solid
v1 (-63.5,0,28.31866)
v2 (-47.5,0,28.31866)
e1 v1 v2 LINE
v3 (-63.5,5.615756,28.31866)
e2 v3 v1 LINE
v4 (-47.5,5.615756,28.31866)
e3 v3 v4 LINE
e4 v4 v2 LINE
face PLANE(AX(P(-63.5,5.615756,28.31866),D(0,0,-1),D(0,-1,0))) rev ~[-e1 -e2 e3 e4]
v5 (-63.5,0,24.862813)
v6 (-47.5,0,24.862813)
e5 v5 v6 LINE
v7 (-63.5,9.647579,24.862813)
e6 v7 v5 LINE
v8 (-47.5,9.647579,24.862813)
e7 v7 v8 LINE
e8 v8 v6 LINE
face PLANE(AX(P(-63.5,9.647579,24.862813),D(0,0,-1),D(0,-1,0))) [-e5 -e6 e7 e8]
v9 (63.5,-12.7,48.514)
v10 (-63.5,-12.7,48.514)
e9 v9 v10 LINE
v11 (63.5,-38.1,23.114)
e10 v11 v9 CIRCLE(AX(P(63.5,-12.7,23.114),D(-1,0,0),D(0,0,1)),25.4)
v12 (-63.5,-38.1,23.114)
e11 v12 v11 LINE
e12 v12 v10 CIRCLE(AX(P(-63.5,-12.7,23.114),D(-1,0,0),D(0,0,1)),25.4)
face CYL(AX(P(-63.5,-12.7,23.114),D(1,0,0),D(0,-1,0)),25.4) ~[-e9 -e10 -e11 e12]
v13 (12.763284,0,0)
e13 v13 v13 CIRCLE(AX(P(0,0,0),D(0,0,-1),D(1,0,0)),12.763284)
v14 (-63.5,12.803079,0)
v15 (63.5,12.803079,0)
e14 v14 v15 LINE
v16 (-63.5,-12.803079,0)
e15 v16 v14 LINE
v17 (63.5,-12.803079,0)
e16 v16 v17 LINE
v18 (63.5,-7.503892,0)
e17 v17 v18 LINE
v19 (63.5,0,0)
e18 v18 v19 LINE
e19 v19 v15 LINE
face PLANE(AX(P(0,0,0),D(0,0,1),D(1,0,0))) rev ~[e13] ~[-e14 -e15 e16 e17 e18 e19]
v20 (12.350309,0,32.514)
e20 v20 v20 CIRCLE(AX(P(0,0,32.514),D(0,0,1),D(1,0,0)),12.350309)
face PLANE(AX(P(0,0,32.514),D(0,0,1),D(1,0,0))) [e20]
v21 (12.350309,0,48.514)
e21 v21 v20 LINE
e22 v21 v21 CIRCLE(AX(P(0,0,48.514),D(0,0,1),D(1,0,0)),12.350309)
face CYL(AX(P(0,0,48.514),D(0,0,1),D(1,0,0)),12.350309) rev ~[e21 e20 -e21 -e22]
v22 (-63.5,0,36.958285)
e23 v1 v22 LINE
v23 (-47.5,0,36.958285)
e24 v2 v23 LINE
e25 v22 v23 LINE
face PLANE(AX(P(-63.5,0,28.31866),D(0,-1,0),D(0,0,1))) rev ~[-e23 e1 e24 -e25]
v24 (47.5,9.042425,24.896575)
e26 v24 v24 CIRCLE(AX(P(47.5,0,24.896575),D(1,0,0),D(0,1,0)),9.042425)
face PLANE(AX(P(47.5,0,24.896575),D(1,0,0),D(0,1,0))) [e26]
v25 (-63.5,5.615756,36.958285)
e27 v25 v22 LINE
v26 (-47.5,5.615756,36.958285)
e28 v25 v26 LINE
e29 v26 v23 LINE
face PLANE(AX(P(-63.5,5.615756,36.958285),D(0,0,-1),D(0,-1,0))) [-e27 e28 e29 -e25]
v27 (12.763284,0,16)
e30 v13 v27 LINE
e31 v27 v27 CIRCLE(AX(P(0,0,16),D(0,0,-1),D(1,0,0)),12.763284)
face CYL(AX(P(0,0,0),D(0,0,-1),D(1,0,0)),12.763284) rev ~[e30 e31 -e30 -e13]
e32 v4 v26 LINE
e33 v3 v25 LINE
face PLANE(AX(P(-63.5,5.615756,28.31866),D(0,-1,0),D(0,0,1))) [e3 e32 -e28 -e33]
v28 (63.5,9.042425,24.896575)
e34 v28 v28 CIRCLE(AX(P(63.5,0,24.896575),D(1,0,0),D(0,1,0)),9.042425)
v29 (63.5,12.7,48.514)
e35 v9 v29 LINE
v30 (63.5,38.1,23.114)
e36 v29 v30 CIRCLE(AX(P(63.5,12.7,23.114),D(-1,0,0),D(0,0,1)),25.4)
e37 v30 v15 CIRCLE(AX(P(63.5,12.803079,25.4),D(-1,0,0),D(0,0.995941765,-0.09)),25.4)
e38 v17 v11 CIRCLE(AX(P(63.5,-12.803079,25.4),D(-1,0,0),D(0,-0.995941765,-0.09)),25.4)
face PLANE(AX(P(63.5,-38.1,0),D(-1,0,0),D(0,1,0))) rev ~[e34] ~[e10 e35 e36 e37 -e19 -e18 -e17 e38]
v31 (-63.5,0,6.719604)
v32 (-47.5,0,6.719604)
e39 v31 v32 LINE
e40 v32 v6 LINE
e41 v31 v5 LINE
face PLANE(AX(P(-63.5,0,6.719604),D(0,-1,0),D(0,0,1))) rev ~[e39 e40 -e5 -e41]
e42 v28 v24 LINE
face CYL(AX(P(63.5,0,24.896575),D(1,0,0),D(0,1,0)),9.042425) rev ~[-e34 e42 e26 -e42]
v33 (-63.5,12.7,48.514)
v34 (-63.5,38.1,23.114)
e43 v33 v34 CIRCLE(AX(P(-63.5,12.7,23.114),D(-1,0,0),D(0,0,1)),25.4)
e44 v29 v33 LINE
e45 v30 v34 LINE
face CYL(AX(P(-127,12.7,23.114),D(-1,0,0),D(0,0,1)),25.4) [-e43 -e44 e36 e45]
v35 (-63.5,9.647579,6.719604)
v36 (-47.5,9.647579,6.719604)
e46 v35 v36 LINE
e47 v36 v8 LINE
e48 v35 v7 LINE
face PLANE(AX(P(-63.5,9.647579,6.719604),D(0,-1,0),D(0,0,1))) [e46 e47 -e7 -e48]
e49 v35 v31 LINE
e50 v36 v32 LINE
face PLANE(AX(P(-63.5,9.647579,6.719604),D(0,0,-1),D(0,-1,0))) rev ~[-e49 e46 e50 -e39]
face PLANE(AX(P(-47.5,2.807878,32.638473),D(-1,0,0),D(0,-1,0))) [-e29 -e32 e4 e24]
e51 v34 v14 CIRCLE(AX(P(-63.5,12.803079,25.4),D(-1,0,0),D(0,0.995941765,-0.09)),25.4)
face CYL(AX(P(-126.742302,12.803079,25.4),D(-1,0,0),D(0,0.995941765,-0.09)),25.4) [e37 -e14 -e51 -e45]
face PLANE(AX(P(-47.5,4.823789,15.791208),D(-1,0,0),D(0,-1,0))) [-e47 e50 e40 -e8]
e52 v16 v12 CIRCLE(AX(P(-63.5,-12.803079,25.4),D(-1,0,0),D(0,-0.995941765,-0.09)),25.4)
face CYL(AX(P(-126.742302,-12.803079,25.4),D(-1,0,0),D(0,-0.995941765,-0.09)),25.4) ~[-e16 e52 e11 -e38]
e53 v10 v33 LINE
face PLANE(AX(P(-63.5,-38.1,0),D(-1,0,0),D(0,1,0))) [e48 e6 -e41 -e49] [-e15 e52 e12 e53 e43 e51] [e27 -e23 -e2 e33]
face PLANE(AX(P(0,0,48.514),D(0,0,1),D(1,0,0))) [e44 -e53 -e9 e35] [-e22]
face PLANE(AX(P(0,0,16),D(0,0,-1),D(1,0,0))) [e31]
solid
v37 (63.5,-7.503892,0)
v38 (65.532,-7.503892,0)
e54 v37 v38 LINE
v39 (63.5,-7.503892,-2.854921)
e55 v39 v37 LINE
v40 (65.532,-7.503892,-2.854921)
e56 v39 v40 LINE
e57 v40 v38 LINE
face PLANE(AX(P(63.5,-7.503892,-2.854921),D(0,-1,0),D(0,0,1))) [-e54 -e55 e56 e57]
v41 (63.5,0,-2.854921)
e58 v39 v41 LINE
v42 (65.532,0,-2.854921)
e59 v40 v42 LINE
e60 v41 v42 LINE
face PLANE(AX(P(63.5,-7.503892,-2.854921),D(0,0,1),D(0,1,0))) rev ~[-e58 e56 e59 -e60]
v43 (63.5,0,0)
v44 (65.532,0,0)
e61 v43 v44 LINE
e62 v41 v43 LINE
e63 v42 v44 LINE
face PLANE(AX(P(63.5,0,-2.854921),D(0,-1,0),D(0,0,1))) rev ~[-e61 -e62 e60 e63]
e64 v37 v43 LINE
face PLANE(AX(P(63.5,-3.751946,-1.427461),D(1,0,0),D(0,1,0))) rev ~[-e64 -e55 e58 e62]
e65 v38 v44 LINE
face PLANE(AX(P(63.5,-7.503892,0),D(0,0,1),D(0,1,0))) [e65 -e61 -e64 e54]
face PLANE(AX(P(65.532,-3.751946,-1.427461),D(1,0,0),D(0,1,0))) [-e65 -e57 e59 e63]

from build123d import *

# Parameters (mm, degrees)
F0_W        = 127
F0_H        = 76.2
F1_DEPTH    = 48.514
F2_R        = 25.4
F3_T1_DEPTH = 253.4846042015
F3_T3_DEPTH = 254
F4_T1_DEPTH = 253.4846042015
F5_W        = 7.5038918294
F5_H        = 2.8549211565
F6_DEPTH    = 2.032
F7_W        = 9.6475789323
F7_H        = 18.1432091631
F8_DEPTH    = 16
F9_W        = 5.6157563813
F9_H        = 8.6396243423
F10_DEPTH   = 16
F11_R       = 9.0424254563
F12_DEPTH   = 16
F13_R       = 12.7632843375
F14_DEPTH   = 16
F15_R       = 12.3503086405
F16_DEPTH   = 16
F17_R       = 4.9563337245
F18_DEPTH   = 1


# Not quite as in the source:
# - a fillet or chamfer that OpenCascade refuses, or shapes differently, is made with other operations: its cross-section is extruded or revolved along the edge and cut away or added


with BuildPart() as f1:
    # F0 (on Top) → F1 (new body)
    with BuildSketch(Plane.XY):
        Rectangle(F0_W, F0_H)
    extrude(amount=F1_DEPTH)

    # F2
    f2_edges = [f1.edges().sort_by_distance(p)[0] for p in [
        (0, -38.1, 48.514),
    ]]
    fillet(f2_edges, radius=F2_R)

    # F3: fillet of radius 25.4 on 2 edges, made by hand

    # F3_s2 → F3_t1 (cut)
    with BuildSketch(Plane.YZ.offset(-126.7423021007)):
        with BuildLine():
            ThreePointArc((-38.1, 23.114), (-29.936315865, 6.6486747135), (-12.8030791597, 0))
            Line((-12.8030791597, 0), (-38.1, 0))
            Line((-38.1, 0), (-38.1, 23.114))
        make_face()
    extrude(amount=F3_T1_DEPTH, mode=Mode.SUBTRACT)

    # F3_s4 → F3_t3 (cut)
    with BuildSketch(Plane.YZ.offset(-127)):
        with BuildLine():
            ThreePointArc((12.7, 48.514), (30.6605122421, 41.0745122421), (38.1, 23.114))
            Line((38.1, 23.114), (38.1, 48.514))
            Line((38.1, 48.514), (12.7, 48.514))
        make_face()
    extrude(amount=F3_T3_DEPTH, mode=Mode.SUBTRACT)

    # F4: fillet of radius 25.4 on 1 edges, made by hand

    # F4_s2 → F4_t1 (cut)
    with BuildSketch(Plane.YZ.offset(-126.7423021007)):
        with BuildLine():
            ThreePointArc((38.1, 23.114), (29.936315865, 6.6486747135), (12.8030791597, 0))
            Line((12.8030791597, 0), (38.1, 0))
            Line((38.1, 0), (38.1, 23.114))
        make_face()
    extrude(amount=F4_T1_DEPTH, mode=Mode.SUBTRACT)

    # F5 (on face) + F1_face1 (on face) → F6 (join)
    with BuildSketch(Plane.YZ.offset(63.5)):
        with Locations((-3.7519459147, -1.4274605783)):
            Rectangle(F5_W, F5_H)
    with BuildSketch(Plane(origin=(-63.5, 0, 24.2377466976), x_dir=(0, -1, 0), z_dir=(-1, 0, 0))):
        with BuildLine():
            ThreePointArc((38.1, -1.1237466976), (30.6605122421, 16.8367655446), (12.7, 24.2762533024))
            Line((12.7, 24.2762533024), (-12.7, 24.2762533024))
            ThreePointArc((-12.7, 24.2762533024), (-30.6605122421, 16.8367655445), (-38.1, -1.1237466976))
            ThreePointArc((-38.1, -1.1237466976), (-29.936315865, -17.5890719841), (-12.8030791597, -24.2377466976))
            Line((-12.8030791597, -24.2377466976), (12.8030791597, -24.2377466976))
            ThreePointArc((12.8030791597, -24.2377466976), (29.936315865, -17.5890719841), (38.1, -1.1237466976))
        make_face()
    extrude(amount=F6_DEPTH, dir=(1, 0, 0))

    # F7 (on face) → F8 (cut)
    with BuildSketch(Plane(origin=(-63.5, 0, 0), x_dir=(0, -1, 0), z_dir=(-1, 0, 0))):
        with Locations((-4.8237894662, 15.7912082504)):
            Rectangle(F7_W, F7_H)
    extrude(amount=-F8_DEPTH, mode=Mode.SUBTRACT)

    # F9 (on face) → F10 (cut)
    with BuildSketch(Plane(origin=(-63.5, 0, 0), x_dir=(0, -1, 0), z_dir=(-1, 0, 0))):
        with Locations((-2.8078781907, 32.6384725049)):
            Rectangle(F9_W, F9_H)
    extrude(amount=-F10_DEPTH, mode=Mode.SUBTRACT)

    # F11 (on face) → F12 (cut)
    with BuildSketch(Plane.YZ.offset(63.5)):
        with Locations((0, 24.896575138)):
            Circle(F11_R)
    extrude(amount=-F12_DEPTH, mode=Mode.SUBTRACT)

    # F13 (on face) → F14 (cut)
    with BuildSketch(Plane(origin=(0, 0, 0), x_dir=(1, 0, 0), z_dir=(0, 0, -1))):
        Circle(F13_R)
    extrude(amount=-F14_DEPTH, mode=Mode.SUBTRACT)

    # F15 (on face) → F16 (cut)
    with BuildSketch(Plane.XY.offset(48.514)):
        Circle(F15_R)
    extrude(amount=-F16_DEPTH, mode=Mode.SUBTRACT)

    # F17 (on face) → F18 (join)
    with BuildSketch(Plane.XY.offset(48.514)):
        with Locations((-48.0436608195, 0)):
            Circle(F17_R)
    extrude(amount=-F18_DEPTH)


solid = f1.part
